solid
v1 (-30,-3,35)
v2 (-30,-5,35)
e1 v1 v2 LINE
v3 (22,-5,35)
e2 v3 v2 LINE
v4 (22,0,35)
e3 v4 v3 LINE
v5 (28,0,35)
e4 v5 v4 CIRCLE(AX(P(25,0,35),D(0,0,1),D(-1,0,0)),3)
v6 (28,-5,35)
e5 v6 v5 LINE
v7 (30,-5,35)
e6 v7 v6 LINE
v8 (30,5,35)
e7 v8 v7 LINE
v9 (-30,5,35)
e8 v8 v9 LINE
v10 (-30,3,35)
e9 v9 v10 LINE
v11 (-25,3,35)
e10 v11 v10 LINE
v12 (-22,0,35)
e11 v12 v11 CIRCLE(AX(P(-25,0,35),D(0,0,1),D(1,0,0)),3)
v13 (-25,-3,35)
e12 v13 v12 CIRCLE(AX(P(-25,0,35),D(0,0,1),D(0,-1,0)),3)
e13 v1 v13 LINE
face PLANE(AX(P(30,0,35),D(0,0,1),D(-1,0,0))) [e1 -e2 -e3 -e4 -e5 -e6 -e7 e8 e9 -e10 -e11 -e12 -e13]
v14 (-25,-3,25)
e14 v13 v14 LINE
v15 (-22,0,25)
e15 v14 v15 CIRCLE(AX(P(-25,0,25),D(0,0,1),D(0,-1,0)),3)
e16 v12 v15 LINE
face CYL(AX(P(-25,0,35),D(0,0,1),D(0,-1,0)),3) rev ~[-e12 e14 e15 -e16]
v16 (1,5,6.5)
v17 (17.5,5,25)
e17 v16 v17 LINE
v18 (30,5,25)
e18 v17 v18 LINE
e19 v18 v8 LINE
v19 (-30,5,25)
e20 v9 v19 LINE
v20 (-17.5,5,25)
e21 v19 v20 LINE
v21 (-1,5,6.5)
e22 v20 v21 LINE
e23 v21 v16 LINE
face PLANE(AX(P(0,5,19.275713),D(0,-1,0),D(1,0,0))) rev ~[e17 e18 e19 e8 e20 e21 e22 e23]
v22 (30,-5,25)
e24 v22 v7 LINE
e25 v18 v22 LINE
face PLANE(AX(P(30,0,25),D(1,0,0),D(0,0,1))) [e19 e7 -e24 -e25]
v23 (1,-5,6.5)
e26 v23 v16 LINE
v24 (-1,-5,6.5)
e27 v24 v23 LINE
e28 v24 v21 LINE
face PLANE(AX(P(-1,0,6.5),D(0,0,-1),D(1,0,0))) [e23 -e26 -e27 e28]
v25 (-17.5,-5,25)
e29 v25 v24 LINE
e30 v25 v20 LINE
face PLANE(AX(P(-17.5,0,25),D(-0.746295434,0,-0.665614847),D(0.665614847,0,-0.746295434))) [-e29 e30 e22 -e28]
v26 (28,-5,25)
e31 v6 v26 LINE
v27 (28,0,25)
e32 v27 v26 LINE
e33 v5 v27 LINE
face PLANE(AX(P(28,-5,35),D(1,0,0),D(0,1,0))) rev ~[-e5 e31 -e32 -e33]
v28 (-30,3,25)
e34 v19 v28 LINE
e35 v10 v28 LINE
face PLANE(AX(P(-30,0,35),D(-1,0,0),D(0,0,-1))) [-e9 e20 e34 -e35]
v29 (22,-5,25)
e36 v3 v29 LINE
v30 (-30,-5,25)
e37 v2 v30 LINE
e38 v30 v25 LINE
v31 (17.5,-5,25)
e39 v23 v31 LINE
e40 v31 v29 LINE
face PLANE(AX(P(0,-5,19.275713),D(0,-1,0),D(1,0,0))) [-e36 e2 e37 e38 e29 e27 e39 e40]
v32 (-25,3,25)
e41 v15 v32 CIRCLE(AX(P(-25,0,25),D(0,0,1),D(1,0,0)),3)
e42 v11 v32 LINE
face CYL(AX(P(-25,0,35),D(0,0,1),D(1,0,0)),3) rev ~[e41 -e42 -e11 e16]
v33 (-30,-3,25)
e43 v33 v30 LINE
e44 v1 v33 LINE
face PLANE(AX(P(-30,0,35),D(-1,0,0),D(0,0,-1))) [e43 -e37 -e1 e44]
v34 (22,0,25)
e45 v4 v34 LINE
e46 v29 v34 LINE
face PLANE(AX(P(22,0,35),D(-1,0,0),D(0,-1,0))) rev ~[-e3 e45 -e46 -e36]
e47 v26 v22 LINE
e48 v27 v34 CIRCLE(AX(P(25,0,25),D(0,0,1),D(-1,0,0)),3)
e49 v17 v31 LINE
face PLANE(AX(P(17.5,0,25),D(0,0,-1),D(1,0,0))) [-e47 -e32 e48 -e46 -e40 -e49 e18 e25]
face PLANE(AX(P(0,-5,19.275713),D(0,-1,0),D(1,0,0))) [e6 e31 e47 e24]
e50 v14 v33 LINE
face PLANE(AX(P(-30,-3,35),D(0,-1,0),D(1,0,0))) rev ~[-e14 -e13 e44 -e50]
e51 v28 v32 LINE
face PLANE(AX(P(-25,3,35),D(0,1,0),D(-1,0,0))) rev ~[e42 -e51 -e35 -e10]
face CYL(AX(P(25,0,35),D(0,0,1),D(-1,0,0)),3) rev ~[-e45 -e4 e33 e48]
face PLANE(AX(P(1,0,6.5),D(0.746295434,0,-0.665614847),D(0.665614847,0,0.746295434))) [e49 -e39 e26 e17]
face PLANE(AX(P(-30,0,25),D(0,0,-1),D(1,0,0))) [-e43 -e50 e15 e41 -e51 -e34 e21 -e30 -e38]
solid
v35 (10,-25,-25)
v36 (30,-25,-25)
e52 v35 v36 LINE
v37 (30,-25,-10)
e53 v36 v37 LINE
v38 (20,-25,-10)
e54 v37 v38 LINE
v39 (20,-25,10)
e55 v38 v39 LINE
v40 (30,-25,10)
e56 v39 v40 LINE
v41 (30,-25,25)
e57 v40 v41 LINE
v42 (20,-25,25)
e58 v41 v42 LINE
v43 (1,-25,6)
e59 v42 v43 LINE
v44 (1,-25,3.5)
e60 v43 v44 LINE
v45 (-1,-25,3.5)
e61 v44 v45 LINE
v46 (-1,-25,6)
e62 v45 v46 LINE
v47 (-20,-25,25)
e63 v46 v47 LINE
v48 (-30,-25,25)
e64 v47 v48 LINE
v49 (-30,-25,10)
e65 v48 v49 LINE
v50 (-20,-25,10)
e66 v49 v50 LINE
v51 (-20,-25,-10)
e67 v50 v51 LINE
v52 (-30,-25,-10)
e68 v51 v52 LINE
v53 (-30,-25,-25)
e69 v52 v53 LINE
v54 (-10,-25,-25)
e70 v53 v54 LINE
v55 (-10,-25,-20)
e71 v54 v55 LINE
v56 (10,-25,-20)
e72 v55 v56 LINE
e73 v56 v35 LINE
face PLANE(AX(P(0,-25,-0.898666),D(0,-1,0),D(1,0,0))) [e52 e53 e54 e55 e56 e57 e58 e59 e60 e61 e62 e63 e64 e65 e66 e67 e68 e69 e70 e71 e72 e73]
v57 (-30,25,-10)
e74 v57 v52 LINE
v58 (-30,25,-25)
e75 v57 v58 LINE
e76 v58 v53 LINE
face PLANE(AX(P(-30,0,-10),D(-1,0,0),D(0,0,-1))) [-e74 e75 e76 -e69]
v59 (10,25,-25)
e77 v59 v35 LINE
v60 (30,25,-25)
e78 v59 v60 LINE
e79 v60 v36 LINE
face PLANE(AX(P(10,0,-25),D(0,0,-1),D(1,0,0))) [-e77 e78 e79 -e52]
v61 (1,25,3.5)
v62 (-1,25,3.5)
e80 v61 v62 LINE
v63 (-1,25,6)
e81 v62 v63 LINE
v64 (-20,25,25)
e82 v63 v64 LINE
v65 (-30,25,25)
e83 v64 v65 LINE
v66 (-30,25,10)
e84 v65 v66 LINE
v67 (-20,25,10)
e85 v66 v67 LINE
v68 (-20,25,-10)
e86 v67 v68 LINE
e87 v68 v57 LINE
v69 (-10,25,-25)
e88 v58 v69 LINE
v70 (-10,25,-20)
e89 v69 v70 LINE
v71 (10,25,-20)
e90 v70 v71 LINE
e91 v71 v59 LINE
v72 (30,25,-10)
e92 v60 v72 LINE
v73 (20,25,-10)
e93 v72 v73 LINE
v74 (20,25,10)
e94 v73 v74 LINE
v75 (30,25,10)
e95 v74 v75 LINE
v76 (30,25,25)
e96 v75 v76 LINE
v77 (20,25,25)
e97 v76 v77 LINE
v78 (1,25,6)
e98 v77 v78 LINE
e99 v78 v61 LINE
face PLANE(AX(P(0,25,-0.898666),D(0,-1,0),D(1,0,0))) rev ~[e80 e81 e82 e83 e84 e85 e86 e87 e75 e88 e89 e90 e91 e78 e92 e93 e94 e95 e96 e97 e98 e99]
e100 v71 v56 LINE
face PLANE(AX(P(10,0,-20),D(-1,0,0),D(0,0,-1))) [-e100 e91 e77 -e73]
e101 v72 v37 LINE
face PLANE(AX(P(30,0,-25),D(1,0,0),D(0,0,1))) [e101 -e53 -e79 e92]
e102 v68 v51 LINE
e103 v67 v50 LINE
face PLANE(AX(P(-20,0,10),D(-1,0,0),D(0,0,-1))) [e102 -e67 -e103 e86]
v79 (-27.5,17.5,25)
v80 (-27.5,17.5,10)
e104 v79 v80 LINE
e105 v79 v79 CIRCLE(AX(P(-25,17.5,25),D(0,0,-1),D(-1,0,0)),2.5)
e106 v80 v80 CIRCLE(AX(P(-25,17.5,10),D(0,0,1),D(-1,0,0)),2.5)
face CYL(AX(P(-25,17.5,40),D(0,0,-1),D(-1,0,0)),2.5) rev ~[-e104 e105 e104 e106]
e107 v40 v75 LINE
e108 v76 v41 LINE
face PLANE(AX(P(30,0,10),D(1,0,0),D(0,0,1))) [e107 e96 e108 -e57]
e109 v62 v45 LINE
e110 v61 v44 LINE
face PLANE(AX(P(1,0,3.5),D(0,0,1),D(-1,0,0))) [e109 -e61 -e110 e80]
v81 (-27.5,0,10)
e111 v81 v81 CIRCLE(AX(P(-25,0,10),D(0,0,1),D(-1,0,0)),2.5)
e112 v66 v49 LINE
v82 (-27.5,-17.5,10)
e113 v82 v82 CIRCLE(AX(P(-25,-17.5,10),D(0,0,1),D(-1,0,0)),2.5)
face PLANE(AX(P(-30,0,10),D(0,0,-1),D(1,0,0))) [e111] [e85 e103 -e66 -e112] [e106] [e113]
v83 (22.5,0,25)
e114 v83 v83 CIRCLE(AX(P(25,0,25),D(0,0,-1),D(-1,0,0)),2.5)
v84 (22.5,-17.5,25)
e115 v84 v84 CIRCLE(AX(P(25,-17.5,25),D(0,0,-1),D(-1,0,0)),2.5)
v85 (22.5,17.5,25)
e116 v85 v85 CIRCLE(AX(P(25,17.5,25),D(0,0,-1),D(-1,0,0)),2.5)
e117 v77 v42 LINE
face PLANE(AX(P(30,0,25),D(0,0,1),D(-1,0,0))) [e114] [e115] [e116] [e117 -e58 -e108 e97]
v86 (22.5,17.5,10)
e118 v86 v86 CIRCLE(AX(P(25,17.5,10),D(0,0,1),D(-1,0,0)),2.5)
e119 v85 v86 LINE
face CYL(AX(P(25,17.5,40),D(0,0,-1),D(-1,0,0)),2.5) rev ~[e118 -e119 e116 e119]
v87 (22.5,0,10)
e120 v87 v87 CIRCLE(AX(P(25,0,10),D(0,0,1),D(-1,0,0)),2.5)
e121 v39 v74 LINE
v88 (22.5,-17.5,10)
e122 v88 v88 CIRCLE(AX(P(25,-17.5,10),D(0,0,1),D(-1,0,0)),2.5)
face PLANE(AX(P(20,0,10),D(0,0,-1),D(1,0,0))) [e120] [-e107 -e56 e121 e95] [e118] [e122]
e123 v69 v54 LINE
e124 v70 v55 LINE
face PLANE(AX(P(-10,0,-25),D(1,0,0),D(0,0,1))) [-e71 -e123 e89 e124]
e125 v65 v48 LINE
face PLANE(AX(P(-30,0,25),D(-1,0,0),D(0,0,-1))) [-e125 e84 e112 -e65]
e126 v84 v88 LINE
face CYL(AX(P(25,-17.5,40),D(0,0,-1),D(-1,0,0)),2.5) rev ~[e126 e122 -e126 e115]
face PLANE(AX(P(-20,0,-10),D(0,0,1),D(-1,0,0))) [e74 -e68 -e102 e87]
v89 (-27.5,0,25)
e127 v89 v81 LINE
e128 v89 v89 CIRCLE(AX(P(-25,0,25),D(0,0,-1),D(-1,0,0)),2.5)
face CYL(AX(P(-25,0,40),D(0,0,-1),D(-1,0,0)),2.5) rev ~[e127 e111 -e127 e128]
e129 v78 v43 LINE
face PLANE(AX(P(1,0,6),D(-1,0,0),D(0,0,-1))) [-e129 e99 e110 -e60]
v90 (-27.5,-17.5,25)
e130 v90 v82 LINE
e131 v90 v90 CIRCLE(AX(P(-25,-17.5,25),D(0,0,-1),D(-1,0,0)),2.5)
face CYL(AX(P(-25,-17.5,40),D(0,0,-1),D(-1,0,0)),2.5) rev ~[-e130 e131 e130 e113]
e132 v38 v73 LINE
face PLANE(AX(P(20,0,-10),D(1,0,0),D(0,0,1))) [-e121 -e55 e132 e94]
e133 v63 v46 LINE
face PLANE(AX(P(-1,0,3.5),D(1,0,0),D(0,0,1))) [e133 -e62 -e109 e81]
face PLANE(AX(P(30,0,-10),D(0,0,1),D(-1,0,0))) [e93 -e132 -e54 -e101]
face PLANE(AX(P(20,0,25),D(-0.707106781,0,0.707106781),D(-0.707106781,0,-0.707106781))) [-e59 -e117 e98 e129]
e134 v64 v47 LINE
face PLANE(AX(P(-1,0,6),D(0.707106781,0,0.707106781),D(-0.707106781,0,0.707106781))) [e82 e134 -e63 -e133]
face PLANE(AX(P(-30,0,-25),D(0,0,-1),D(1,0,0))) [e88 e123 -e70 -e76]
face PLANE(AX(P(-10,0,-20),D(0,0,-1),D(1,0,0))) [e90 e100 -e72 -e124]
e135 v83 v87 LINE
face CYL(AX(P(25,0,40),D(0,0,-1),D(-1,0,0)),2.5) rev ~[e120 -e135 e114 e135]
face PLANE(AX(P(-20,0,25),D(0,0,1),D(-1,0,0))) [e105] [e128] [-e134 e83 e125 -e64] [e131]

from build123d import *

# Parameters (mm, degrees)
F1_DEPTH = 25
F3_D     = 5
F3_DEPTH = 15
F3_TIP   = 1.5021515476
F4_DEPTH = 5
F6_DEPTH = 60.001


with BuildPart() as f1:
    # F0 (on Front) → F1 (new body, symmetric)
    with BuildSketch(Plane.XZ):
        Polygon((30, 10), (30, 25), (20, 25), (1, 6), (1, 3.5), (-1, 3.5), (-1, 6), (-20, 25), (-30, 25), (-30, 10), (-20, 10), (-20, -10), (-30, -10), (-30, -25), (-10, -25), (-10, -20), (10, -20), (10, -25), (30, -25), (30, -10), (20, -10), (20, 10), align=None)
    extrude(amount=F1_DEPTH, both=True)

    # F3
    with Locations(Plane.XY.offset(25)):
        with Locations((-25, -17.5), (-25, 0), (-25, 17.5), (25, -17.5), (25, 0), (25, 17.5)):
            Hole(F3_D / 2, depth=F3_DEPTH)
            with Locations((0, 0, -(F3_DEPTH + F3_TIP / 2))):  # 118° drill point
                Cone(0, F3_D / 2, F3_TIP, mode=Mode.SUBTRACT)


with BuildPart() as f4:
    # F0 (on Front) → F4 (new body, symmetric)
    with BuildSketch(Plane.XZ):
        Polygon((1, 6.5), (17.5, 25), (-17.5, 25), (-1, 6.5), align=None)
        Polygon((20, 25), (30, 25), (30, 35), (-30, 35), (-30, 25), (-20, 25), (-17.5, 25), (17.5, 25), align=None)
    extrude(amount=F4_DEPTH, both=True)

    # F5 (on face) → F6 (cut, through all)
    with BuildSketch(Plane.XY.offset(35)):
        with BuildLine():
            ThreePointArc((-25, -3), (-22.8786796564, -2.1213203436), (-22, 0))
            ThreePointArc((-22, 0), (-22.8786796564, 2.1213203436), (-25, 3))
            ThreePointArc((-25, 3), (-28, 0), (-25, -3))
        make_face()
        with BuildLine():
            ThreePointArc((-25, -3), (-28, 0), (-25, 3))
            Line((-25, 3), (-30, 3))
            Line((-30, 3), (-30, -3))
            Line((-30, -3), (-25, -3))
        make_face()
        with BuildLine():
            ThreePointArc((28, 0), (25, 3), (22, 0))
            ThreePointArc((22, 0), (25, -3), (28, 0))
        make_face()
        with BuildLine():
            Line((22, 0), (22, -5))
            Line((22, -5), (28, -5))
            Line((28, -5), (28, 0))
            ThreePointArc((28, 0), (25, -3), (22, 0))
        make_face()
    extrude(amount=-F6_DEPTH, mode=Mode.SUBTRACT)


solid = Compound([f1.part, f4.part])
